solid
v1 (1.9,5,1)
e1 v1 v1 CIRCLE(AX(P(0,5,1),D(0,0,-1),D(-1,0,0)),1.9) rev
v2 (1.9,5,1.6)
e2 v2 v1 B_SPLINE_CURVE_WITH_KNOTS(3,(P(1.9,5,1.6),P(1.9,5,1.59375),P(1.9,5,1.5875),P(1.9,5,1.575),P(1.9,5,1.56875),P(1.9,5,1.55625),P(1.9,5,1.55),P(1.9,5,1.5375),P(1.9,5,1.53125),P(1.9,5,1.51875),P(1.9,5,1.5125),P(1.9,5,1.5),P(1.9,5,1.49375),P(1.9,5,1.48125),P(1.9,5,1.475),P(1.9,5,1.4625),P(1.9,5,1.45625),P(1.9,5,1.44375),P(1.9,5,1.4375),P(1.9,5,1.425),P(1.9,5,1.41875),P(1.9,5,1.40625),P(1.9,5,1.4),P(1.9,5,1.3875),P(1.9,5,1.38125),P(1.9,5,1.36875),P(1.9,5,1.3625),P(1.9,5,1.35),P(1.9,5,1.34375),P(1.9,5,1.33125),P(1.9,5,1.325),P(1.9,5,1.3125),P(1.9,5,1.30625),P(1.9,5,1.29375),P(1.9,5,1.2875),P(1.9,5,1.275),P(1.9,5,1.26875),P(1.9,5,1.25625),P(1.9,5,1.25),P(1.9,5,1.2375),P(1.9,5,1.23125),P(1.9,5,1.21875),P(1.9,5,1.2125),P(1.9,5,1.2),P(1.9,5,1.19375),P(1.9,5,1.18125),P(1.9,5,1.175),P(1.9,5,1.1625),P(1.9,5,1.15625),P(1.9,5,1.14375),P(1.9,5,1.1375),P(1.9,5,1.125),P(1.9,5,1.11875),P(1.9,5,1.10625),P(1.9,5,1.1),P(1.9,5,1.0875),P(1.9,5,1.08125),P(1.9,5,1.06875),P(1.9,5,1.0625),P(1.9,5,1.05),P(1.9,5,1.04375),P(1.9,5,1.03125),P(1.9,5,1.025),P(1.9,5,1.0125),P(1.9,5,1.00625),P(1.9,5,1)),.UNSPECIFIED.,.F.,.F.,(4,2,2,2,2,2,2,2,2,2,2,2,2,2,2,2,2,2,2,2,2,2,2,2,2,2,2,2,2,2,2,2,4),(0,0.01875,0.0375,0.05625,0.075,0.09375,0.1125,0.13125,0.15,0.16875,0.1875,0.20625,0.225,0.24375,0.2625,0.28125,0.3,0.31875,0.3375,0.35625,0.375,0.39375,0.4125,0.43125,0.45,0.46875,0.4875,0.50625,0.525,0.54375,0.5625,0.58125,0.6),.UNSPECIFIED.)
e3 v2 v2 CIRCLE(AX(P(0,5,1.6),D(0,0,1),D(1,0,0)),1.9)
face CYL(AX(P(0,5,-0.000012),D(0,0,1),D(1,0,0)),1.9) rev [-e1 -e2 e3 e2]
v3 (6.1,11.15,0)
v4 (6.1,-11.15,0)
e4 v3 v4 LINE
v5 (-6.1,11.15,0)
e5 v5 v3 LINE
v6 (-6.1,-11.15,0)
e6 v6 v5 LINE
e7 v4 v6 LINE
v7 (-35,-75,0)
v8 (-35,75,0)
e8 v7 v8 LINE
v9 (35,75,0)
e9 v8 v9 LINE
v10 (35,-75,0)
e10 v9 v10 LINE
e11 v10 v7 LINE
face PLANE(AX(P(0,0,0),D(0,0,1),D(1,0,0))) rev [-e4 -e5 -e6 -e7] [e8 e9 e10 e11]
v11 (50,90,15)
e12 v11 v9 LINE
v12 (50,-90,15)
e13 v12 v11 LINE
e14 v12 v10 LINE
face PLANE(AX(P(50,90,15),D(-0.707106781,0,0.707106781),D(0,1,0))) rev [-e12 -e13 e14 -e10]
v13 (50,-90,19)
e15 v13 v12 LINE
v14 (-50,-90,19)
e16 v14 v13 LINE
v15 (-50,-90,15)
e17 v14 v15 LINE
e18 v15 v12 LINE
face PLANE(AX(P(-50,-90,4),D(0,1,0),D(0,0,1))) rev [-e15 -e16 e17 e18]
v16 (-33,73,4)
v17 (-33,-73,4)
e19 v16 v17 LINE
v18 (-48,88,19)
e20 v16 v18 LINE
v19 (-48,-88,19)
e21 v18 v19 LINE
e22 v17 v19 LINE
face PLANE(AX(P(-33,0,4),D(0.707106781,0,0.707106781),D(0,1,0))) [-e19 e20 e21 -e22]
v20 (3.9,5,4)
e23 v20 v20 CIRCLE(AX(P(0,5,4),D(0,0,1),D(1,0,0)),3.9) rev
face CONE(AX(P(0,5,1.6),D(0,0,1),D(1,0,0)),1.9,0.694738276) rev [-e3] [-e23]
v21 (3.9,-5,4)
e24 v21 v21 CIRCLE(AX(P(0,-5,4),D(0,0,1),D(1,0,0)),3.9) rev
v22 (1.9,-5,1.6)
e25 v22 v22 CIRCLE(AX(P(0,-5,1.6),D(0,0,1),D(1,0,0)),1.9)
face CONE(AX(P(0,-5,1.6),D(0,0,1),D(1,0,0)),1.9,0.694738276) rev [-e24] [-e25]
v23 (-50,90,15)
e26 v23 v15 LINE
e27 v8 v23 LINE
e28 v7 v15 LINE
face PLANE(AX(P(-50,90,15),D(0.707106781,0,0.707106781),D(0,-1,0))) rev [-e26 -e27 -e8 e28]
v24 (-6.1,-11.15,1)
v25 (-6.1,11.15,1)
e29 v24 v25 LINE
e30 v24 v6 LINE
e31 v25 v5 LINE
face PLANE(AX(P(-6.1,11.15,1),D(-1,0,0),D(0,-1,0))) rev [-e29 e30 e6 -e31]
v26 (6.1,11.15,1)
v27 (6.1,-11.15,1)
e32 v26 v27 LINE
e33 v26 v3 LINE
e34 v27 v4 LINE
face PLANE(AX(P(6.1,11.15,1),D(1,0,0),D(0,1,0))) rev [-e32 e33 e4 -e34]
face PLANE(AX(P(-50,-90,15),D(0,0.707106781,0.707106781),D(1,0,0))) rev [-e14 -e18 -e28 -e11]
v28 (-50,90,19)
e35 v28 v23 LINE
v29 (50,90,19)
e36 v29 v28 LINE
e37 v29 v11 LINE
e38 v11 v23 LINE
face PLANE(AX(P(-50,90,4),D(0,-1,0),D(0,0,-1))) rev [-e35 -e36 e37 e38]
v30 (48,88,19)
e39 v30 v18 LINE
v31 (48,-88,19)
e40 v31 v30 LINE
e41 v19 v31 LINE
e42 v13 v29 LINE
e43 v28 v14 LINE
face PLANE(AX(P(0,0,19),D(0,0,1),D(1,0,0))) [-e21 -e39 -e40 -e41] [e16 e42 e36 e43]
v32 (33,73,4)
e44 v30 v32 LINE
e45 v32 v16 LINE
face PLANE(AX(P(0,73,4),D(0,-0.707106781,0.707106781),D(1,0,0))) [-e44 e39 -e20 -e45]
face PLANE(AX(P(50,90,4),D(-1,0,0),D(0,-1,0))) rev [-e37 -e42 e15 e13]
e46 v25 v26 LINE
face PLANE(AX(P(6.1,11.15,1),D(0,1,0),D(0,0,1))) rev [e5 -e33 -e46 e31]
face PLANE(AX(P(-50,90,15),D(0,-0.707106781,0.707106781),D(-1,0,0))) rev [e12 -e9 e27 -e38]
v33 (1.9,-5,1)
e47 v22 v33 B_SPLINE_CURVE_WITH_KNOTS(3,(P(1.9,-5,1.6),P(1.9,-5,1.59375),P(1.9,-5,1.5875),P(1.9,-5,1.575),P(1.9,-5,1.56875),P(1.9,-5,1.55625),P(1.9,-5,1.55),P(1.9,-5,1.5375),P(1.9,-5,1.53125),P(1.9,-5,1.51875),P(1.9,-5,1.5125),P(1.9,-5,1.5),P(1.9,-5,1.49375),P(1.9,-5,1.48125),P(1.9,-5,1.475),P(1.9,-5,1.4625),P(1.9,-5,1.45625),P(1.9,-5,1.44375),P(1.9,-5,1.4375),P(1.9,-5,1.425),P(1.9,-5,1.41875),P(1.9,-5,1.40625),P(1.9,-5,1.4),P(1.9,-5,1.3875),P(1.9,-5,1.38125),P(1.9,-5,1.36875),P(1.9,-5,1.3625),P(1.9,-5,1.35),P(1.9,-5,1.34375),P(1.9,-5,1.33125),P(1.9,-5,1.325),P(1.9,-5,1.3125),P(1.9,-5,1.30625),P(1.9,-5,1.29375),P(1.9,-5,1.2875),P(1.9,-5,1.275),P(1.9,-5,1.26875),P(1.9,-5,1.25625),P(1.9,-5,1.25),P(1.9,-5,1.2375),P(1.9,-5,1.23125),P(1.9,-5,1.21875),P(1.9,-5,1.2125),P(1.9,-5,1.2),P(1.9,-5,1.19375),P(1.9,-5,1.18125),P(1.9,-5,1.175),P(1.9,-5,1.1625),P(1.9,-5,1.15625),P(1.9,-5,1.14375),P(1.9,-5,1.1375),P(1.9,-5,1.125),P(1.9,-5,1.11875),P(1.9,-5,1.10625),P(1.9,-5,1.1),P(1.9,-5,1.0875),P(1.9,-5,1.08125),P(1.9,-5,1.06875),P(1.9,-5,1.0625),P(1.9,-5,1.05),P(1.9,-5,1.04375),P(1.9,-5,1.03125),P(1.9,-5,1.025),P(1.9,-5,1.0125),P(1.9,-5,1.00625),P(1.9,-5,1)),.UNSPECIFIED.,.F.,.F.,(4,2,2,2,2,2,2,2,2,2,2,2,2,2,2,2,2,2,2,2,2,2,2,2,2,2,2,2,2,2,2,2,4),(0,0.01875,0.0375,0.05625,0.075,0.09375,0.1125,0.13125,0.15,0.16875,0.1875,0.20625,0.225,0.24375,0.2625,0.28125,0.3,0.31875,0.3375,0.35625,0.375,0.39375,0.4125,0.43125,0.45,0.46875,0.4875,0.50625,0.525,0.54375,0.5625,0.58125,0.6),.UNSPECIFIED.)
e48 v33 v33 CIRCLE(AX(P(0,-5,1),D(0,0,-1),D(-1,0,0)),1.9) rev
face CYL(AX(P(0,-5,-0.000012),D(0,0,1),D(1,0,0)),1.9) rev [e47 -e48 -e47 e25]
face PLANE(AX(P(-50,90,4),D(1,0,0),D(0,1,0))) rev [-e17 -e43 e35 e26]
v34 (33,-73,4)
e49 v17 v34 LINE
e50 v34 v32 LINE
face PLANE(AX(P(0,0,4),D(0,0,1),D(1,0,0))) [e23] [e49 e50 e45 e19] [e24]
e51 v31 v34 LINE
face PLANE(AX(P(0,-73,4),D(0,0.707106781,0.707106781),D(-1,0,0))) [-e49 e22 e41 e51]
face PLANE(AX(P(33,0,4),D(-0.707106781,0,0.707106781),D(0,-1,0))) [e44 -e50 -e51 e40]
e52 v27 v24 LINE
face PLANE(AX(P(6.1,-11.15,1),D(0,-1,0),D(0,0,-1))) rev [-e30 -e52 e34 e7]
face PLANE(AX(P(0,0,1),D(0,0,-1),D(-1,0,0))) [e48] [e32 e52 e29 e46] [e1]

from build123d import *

# Parameters (mm, degrees)
SKETCH_1_W               = 100
SKETCH_1_H               = 180
EXTRUDE_1_DEPTH          = 4
SKETCH_4_W               = 100
SKETCH_4_H               = 180
SKETCH_4_W_2             = 96
SKETCH_4_H_2             = 176
EXTRUDE_3_DEPTH          = 15
CHAMFER_1_SIZE           = 15
CUT_EXTRUDE_3_DEPTH      = 10
CUT_EXTRUDE_3_DEPTH_BACK = 105.694794522
SKETCH_6_R               = 1.9
CHAMFER_2_SIZE           = 2
CHAMFER_2_SIZE2          = 2.4
SKETCH_10_W              = 12.2
SKETCH_10_H              = 22.3
CUT_EXTRUDE_4_DEPTH      = 1


with BuildPart() as part:
    # 스케치1 → 보스-돌출1 (new body)
    with BuildSketch(Plane.XY):
        Rectangle(SKETCH_1_W, SKETCH_1_H)
    extrude(amount=EXTRUDE_1_DEPTH)

    # 스케치4 → 보스-돌출3 (add)
    with BuildSketch(Plane.XY.offset(4)):
        Rectangle(SKETCH_4_W, SKETCH_4_H)
        Rectangle(SKETCH_4_W_2, SKETCH_4_H_2, mode=Mode.SUBTRACT)
    extrude(amount=EXTRUDE_3_DEPTH)

    # 모따기1
    chamfer_1_edges = [part.edges().sort_by_distance(p)[0] for p in [
        (-48, 0, 4),
        (0, -88, 4),
        (50, 0, 0),
        (0, 90, 0),
        (-50, 0, 0),
        (0, -90, 0),
        (48, 0, 4),
        (0, 88, 4),
    ]]
    chamfer(chamfer_1_edges, length=CHAMFER_1_SIZE - 0.0001)  # a hair under: the kernel refuses the full size

    # 스케치6 → 컷-돌출3 (cut, two sides: drawn at the far end of the back side and taken through both)
    with BuildSketch(Plane.XY.offset(-CUT_EXTRUDE_3_DEPTH_BACK)):
        with Locations((0, 5)):
            Circle(SKETCH_6_R)
        with Locations((0, -5)):
            Circle(SKETCH_6_R)
    extrude(amount=CUT_EXTRUDE_3_DEPTH + CUT_EXTRUDE_3_DEPTH_BACK, mode=Mode.SUBTRACT)

    # 모따기2
    chamfer_2_edges = [part.edges().sort_by_distance(p)[0] for p in [
        (-1.9, 5, 4),
        (-1.9, -5, 4),
    ]]
    chamfer_2_side = [part.faces().sort_by_distance(p)[0] for p in [
        (0, 0, 4),
    ]]
    chamfer(chamfer_2_edges, length=CHAMFER_2_SIZE, length2=CHAMFER_2_SIZE2, reference=chamfer_2_side[0])

    # 스케치10 → 컷-돌출4 (cut)
    with BuildSketch(Plane(origin=(0, 0, 0), x_dir=(-1, 0, 0), z_dir=(0, 0, -1))):
        Rectangle(SKETCH_10_W, SKETCH_10_H)
    extrude(amount=-CUT_EXTRUDE_4_DEPTH, mode=Mode.SUBTRACT)


solid = part.part
